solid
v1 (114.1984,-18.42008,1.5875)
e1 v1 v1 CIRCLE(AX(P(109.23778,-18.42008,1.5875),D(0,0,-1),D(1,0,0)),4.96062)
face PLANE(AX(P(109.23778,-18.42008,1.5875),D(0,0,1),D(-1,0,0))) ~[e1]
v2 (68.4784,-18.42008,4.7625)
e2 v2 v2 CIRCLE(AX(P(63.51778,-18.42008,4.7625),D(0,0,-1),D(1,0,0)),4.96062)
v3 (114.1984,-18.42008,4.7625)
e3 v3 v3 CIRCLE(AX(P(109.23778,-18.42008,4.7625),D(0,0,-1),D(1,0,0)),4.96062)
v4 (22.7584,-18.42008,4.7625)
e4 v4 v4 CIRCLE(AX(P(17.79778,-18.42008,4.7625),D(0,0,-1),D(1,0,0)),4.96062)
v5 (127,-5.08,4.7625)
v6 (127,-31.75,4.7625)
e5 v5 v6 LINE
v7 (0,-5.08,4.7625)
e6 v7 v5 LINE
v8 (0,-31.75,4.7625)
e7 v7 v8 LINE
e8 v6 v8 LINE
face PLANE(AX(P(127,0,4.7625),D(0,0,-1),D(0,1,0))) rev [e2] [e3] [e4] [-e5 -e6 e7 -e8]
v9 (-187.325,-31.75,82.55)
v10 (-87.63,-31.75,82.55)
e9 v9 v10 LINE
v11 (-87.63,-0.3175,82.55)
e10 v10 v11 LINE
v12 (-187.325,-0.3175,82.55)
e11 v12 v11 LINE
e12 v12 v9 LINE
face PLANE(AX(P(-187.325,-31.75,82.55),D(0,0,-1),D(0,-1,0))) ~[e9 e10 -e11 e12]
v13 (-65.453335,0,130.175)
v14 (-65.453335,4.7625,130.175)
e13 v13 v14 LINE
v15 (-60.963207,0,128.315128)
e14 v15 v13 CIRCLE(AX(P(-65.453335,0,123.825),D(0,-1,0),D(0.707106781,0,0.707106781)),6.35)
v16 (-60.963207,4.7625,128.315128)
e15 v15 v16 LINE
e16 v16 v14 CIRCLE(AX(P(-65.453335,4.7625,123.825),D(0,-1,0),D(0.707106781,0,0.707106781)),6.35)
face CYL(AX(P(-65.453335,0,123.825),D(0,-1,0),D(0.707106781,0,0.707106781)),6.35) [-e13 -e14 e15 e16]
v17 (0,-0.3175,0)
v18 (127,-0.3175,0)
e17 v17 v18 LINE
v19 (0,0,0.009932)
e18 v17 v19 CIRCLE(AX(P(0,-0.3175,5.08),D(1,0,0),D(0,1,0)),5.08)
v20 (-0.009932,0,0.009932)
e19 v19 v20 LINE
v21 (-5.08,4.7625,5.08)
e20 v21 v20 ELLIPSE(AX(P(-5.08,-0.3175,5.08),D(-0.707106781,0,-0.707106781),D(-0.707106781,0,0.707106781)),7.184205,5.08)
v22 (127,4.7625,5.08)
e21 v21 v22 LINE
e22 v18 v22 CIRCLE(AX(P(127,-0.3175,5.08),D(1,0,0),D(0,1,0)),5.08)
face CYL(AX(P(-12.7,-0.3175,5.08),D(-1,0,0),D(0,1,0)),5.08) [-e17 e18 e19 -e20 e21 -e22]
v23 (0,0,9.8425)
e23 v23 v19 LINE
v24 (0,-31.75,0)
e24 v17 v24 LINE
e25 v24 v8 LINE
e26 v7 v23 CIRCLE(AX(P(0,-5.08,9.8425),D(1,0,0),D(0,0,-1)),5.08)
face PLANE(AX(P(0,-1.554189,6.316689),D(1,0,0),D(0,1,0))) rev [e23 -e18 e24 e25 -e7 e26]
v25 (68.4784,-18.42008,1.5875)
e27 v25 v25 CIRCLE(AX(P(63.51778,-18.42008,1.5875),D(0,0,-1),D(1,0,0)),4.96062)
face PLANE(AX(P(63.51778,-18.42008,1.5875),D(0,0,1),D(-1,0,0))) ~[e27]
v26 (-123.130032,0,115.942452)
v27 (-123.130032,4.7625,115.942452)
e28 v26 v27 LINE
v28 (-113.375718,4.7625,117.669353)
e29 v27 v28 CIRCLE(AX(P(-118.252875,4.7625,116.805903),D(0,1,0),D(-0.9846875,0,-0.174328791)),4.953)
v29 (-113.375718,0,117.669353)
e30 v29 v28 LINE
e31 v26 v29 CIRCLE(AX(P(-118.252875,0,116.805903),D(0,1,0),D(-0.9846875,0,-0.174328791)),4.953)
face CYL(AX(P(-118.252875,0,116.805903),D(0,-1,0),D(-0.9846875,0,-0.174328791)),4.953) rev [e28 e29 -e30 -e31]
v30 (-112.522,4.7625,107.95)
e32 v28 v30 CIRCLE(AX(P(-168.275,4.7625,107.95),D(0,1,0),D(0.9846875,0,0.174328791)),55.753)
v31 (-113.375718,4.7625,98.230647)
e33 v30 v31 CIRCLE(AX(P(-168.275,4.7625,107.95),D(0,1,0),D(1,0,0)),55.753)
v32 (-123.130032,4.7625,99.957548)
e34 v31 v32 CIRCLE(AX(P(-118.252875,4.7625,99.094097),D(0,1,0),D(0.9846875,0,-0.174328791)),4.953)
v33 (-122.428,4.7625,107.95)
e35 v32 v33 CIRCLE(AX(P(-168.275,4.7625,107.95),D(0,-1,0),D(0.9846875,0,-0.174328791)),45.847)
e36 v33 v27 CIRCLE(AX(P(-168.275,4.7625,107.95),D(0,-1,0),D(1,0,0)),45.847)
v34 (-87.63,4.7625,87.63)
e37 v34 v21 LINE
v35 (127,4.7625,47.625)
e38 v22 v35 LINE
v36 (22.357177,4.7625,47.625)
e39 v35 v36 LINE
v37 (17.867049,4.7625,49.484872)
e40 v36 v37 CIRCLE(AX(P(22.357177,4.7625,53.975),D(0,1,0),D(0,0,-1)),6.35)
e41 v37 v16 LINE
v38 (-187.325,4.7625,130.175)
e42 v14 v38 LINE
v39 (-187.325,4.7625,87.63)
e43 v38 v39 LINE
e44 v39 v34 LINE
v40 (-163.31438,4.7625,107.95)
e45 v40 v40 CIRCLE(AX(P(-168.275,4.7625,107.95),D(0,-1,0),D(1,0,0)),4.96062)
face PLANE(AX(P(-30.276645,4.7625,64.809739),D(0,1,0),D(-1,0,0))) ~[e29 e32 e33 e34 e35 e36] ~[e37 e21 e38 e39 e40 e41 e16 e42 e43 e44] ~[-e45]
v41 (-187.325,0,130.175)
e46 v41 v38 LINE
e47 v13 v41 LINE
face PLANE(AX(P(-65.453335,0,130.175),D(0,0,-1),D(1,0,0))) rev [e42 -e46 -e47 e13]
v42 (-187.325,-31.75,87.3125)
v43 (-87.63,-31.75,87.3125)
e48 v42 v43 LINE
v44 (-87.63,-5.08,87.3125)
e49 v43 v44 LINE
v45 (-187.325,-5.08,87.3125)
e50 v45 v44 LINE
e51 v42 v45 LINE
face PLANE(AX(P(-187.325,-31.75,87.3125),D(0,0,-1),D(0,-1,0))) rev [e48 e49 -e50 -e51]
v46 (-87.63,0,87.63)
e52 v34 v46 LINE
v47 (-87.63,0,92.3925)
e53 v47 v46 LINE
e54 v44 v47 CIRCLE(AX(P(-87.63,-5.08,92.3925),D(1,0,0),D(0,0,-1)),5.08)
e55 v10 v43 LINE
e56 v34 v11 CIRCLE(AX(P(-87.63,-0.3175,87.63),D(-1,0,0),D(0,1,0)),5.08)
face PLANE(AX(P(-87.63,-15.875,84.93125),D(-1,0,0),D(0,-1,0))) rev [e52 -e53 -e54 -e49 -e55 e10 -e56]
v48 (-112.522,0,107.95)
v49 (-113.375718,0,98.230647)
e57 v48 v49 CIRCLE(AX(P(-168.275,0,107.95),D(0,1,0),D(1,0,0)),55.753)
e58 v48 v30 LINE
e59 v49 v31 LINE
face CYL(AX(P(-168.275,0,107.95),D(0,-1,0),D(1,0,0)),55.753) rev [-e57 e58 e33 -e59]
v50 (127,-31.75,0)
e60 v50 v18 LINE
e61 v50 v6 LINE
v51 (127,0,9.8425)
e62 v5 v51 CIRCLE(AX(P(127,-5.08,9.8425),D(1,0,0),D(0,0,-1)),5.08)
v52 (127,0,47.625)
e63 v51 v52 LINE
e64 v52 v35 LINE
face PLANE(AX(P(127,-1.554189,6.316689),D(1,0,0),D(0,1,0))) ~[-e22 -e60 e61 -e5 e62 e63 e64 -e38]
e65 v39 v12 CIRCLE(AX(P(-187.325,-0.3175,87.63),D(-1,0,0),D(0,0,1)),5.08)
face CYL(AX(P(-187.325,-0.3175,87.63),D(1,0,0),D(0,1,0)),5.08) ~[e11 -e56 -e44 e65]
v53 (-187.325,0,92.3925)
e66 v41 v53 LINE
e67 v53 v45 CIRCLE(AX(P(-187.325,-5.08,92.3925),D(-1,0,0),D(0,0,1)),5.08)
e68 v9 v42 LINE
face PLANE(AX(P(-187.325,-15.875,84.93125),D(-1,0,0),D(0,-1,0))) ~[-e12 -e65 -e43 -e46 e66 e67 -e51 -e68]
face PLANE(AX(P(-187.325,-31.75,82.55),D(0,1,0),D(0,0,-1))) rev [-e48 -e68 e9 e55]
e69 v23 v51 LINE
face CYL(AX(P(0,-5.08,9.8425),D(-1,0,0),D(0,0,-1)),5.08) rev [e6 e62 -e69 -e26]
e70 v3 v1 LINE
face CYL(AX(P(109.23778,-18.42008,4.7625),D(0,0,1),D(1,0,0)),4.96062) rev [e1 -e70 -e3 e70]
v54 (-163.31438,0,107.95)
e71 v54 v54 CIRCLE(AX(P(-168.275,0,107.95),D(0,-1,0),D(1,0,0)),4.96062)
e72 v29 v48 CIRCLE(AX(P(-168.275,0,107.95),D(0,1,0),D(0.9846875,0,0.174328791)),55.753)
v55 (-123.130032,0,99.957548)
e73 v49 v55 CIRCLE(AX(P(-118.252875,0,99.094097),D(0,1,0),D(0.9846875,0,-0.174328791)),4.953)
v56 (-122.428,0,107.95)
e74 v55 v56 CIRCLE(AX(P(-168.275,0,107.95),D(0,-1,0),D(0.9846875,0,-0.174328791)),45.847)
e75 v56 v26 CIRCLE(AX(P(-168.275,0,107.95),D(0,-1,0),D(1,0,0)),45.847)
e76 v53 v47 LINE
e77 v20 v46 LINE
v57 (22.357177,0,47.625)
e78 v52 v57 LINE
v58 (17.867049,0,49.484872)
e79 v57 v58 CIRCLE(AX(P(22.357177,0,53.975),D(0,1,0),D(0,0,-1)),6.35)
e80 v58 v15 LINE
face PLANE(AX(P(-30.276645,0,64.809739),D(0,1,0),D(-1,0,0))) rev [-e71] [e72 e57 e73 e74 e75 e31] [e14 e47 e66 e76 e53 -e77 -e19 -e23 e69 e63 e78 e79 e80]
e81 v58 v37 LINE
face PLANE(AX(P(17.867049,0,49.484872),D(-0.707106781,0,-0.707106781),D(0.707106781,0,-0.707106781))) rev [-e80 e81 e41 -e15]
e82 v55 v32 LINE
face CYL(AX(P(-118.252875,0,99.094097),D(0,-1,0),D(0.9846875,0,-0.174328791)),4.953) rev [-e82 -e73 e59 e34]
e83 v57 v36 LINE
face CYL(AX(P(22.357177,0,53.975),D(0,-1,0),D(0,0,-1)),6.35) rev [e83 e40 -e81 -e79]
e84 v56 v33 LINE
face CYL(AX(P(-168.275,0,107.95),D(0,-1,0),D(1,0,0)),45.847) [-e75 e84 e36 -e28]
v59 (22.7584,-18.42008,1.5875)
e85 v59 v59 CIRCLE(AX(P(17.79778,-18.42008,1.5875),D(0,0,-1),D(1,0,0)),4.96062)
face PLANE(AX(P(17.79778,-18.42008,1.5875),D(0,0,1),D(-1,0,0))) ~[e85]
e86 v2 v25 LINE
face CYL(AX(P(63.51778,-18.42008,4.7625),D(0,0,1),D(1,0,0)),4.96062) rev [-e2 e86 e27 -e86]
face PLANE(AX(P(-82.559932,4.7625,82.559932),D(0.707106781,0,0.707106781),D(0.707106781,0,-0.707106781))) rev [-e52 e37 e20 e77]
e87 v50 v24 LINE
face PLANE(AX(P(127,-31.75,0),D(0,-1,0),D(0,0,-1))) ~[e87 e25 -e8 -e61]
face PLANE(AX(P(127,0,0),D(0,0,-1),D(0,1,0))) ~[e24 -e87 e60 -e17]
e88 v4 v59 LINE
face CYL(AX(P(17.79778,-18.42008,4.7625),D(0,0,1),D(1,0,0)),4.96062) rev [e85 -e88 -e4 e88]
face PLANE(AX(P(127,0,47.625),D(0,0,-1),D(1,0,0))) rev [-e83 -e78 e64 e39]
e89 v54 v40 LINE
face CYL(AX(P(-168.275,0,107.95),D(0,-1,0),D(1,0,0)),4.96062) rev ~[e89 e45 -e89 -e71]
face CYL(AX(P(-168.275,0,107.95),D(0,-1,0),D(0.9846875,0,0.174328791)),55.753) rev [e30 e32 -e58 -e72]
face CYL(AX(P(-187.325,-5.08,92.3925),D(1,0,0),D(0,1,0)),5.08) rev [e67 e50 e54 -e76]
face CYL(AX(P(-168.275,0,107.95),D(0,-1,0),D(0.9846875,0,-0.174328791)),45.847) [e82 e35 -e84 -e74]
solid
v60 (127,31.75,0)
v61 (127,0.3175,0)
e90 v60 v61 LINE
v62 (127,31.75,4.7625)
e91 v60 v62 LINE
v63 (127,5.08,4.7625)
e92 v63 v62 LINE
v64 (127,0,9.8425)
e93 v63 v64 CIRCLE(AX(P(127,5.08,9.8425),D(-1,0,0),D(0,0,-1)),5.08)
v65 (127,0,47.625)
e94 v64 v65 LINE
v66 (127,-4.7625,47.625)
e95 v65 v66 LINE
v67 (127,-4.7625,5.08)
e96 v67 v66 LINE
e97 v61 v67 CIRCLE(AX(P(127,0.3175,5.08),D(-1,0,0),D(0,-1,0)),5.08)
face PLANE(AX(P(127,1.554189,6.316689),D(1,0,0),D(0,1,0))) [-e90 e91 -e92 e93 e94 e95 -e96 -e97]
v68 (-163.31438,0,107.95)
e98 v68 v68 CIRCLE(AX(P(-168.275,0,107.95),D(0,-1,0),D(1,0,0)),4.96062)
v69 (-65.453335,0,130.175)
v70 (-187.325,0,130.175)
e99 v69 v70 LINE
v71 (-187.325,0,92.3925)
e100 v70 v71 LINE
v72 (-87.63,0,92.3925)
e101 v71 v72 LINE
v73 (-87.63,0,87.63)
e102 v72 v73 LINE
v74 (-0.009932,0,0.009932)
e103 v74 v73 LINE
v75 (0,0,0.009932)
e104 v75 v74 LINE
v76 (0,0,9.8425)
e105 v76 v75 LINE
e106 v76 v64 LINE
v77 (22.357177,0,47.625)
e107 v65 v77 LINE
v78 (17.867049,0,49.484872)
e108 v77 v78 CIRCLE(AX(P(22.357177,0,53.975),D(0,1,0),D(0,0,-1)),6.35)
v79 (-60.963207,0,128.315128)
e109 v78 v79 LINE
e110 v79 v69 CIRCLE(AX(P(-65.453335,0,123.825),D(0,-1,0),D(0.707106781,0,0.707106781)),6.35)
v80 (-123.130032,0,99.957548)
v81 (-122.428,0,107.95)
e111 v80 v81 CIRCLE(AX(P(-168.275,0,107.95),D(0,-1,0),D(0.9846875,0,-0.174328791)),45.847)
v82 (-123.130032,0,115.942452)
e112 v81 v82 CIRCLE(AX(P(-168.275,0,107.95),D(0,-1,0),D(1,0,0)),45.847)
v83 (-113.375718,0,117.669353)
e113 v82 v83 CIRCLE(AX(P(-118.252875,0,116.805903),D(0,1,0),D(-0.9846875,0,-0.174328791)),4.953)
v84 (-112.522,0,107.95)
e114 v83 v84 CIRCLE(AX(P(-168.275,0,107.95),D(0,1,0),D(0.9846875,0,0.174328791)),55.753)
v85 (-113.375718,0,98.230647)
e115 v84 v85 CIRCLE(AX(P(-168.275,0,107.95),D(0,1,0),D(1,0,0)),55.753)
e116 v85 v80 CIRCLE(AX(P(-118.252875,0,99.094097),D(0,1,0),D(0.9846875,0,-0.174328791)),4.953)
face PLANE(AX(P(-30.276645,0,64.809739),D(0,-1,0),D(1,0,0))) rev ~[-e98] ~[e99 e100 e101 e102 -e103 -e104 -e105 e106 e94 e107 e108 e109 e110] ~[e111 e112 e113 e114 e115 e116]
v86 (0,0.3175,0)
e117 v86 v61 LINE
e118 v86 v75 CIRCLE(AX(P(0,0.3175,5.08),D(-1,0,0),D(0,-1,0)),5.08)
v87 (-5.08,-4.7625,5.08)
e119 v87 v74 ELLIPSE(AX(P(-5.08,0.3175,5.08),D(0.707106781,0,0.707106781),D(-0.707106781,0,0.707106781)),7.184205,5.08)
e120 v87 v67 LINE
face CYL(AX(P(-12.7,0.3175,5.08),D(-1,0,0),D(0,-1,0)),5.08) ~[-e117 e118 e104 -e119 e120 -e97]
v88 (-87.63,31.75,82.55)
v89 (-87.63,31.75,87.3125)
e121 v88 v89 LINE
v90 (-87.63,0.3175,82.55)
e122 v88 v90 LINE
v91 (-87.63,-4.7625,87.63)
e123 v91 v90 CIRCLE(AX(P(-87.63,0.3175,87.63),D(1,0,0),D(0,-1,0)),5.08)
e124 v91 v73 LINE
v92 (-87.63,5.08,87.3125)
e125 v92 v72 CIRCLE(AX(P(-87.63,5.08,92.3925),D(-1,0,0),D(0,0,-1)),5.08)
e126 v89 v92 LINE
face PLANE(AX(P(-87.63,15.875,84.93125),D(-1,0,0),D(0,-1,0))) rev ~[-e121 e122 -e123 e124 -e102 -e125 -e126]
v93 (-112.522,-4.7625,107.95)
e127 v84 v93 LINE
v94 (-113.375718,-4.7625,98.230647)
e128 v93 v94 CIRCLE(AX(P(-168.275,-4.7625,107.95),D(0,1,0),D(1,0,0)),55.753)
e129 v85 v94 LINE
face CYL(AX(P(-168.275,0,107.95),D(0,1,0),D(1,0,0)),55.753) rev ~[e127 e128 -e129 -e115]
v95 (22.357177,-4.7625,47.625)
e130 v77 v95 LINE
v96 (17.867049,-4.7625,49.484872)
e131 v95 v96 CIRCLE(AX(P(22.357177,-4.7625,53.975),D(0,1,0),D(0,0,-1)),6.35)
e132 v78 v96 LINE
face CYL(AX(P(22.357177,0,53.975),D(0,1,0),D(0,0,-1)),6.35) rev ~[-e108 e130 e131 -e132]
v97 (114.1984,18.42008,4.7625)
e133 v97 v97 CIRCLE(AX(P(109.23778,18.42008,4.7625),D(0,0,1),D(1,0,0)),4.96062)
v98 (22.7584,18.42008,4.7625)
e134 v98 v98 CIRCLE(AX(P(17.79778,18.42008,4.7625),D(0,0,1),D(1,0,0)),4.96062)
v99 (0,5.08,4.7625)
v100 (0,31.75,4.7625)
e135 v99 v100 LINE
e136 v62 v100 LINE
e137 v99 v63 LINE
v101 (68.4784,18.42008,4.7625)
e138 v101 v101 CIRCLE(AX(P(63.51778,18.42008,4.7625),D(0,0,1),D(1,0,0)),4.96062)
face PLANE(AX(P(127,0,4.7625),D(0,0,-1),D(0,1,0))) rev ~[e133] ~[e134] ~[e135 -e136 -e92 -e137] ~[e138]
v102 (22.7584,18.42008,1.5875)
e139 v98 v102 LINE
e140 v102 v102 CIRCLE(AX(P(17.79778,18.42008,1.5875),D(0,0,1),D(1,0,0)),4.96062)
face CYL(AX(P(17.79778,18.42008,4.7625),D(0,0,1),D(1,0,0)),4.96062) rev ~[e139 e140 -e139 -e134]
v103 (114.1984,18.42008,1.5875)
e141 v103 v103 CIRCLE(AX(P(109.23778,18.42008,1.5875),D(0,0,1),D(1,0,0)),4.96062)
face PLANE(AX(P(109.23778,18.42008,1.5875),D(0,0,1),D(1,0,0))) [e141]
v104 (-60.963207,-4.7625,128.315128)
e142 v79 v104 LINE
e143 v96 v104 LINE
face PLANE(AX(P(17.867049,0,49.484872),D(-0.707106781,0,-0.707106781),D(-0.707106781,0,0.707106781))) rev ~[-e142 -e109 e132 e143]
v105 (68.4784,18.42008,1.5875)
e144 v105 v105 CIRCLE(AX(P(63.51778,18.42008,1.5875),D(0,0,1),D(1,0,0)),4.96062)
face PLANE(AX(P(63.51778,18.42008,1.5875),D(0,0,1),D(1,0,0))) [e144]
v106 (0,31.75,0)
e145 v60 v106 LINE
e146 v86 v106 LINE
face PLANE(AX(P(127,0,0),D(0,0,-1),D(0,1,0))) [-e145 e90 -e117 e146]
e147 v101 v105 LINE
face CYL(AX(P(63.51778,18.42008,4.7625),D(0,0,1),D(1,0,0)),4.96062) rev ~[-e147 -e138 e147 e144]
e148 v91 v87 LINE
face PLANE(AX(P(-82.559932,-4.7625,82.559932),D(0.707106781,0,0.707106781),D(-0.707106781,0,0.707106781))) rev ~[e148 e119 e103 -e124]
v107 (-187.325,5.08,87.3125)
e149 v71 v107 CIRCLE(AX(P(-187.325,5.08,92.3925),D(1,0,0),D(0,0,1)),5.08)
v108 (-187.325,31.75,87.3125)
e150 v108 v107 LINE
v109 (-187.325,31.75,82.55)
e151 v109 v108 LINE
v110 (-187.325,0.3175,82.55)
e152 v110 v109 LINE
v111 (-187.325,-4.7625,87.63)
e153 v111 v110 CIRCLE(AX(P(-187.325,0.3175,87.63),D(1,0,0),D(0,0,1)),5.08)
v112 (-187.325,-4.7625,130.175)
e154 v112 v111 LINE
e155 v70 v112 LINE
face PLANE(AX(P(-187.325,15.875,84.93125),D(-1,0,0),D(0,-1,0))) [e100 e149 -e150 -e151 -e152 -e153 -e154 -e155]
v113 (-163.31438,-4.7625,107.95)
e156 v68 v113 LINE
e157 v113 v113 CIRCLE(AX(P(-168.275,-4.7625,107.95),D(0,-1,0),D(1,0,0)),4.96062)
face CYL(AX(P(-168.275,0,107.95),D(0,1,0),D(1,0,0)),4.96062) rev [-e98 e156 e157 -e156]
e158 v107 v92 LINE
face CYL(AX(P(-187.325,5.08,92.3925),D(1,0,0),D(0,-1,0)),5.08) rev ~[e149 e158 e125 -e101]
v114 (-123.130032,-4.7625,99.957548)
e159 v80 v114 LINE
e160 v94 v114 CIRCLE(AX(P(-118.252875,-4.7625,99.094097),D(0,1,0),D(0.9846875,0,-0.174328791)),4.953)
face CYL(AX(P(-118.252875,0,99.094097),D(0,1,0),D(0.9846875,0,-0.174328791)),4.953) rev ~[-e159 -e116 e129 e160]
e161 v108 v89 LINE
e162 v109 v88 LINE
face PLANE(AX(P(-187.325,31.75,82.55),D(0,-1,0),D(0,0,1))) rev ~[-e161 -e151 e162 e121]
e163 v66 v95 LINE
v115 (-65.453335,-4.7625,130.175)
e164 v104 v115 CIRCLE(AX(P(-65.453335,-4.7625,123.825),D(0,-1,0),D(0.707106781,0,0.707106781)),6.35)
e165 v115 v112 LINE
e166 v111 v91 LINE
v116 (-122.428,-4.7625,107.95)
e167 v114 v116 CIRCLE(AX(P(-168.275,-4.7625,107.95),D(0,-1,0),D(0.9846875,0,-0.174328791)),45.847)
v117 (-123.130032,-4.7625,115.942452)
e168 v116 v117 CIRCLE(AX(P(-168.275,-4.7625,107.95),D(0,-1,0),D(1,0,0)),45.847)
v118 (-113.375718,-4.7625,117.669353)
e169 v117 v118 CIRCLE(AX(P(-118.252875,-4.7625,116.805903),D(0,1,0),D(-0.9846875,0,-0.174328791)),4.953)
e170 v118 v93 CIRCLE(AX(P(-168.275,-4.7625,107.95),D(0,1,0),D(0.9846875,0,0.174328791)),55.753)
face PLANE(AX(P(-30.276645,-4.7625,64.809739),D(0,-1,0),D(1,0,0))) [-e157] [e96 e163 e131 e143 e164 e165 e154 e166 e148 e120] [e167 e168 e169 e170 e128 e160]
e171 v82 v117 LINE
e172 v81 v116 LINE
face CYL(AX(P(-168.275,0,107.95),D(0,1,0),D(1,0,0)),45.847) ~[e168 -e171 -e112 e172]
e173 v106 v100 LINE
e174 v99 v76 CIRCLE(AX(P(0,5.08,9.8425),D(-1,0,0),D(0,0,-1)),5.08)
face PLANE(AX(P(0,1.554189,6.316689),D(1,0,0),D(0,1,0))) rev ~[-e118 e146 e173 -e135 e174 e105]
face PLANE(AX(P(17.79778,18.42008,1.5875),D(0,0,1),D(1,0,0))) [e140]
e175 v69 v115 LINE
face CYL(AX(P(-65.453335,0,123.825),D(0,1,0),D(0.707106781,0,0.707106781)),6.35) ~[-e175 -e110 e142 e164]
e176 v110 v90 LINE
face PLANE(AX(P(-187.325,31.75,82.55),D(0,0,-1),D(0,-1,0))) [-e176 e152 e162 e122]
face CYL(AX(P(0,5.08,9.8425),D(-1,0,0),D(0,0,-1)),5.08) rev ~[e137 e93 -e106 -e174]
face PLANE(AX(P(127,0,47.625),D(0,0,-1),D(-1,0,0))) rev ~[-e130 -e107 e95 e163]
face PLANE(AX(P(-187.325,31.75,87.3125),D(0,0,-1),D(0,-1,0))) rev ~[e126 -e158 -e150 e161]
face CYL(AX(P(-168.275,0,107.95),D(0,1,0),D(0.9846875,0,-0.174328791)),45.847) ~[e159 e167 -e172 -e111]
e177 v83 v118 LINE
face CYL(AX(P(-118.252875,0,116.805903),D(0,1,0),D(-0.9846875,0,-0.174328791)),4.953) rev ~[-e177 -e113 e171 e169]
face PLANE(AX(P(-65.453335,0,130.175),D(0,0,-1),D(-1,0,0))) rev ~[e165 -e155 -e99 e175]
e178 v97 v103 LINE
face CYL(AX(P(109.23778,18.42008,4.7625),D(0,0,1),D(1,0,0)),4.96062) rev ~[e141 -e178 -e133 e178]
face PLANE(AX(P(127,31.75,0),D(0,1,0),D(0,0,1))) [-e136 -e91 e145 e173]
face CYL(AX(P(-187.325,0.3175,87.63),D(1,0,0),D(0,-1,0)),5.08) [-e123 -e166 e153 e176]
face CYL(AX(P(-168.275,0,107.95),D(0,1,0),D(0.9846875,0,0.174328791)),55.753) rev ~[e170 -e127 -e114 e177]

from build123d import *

# Parameters (mm, degrees)
F0_R        = 4.96062
F1_DEPTH    = 4.7625
F2_W        = 31.75
F2_H        = 4.7625
F3_DEPTH    = 127
F4_T1_DEPTH = 127
F4_T3_DEPTH = 152.4
F5_R        = 4.96062
F6_DEPTH    = 3.175
F7_W        = 31.75
F7_H        = 4.7625
F8_DEPTH    = 99.695
F9_R        = 5.08
F11_DEPTH   = 25.4


# Not quite as in the source:
# - a fillet or chamfer that OpenCascade refuses, or shapes differently, is made with other operations: its cross-section is extruded or revolved along the edge and cut away or added


with BuildPart() as f1:
    # F0 (on Front) → F1 (new body)
    with BuildSketch(Plane.XZ):
        with BuildLine():
            Line((-82.55, 82.55), (0, 0))
            Line((0, 0), (127, 0))
            Line((127, 0), (127, 47.625))
            Line((127, 47.625), (22.3571770291, 47.625))
            ThreePointArc((22.3571770291, 47.625), (19.9271372336, 48.1083649686), (17.8670489686, 49.4848719395))
            Line((17.8670489686, 49.4848719395), (-60.9632071525, 128.3151280605))
            ThreePointArc((-60.9632071525, 128.3151280605), (-63.0232954175, 129.6916350314), (-65.4533352131, 130.175))
            Line((-65.4533352131, 130.175), (-187.325, 130.175))
            Line((-187.325, 130.175), (-187.325, 82.55))
            Line((-187.325, 82.55), (-82.55, 82.55))
        make_face()
        with Locations((-168.275, 107.95)):
            Circle(F0_R, mode=Mode.SUBTRACT)
        with BuildLine():
            ThreePointArc((-113.3757178125, 117.6693530802), (-112.7358395418, 112.8283875), (-112.522, 107.95))
            ThreePointArc((-112.522, 107.95), (-112.7358395418, 103.0716125), (-113.3757178125, 98.2306469198))
            ThreePointArc((-113.3757178125, 98.2306469198), (-119.1163255014, 94.2169402337), (-123.1300321875, 99.9575479227))
            ThreePointArc((-123.1300321875, 99.9575479227), (-122.6038452724, 103.9383875), (-122.428, 107.95))
            ThreePointArc((-122.428, 107.95), (-122.6038452724, 111.9616125), (-123.1300321875, 115.9424520773))
            ThreePointArc((-123.1300321875, 115.9424520773), (-119.1163255014, 121.6830597663), (-113.3757178125, 117.6693530802))
        make_face(mode=Mode.SUBTRACT)
    extrude(amount=F1_DEPTH)

    # F2 (on face) → F3 (join)
    with BuildSketch(Plane.YZ.offset(127)):
        with Locations((15.875, 2.38125)):
            Rectangle(F2_W, F2_H)
    extrude(amount=-F3_DEPTH)

    # F4: fillet of radius 5.08 on 2 edges, made by hand

    # F4_s2 → F4_t1 (join)
    with BuildSketch(Plane.YZ):
        with BuildLine():
            ThreePointArc((5.08, 4.7625), (1.4878975516, 6.2503975516), (0, 9.8425))
            Line((0, 9.8425), (0, 4.7625))
            Line((0, 4.7625), (5.08, 4.7625))
        make_face()
    extrude(amount=F4_T1_DEPTH)

    # F4_s4 → F4_t3 (cut)
    with BuildSketch(Plane.YZ.offset(-12.7)):
        with BuildLine():
            ThreePointArc((-4.7625, 5.08), (-3.2746024484, 1.4878975516), (0.3175, 0))
            Line((0.3175, 0), (-4.7625, 0))
            Line((-4.7625, 0), (-4.7625, 5.08))
        make_face()
    extrude(amount=F4_T3_DEPTH, mode=Mode.SUBTRACT)

    # F5 (on face) → F6 (cut)
    with BuildSketch(Plane.XY.offset(4.7625)):
        with Locations((17.79778, 18.42008)):
            Circle(F5_R)
        with Locations((63.51778, 18.42008)):
            Circle(F5_R)
        with Locations((109.23778, 18.42008)):
            Circle(F5_R)
    extrude(amount=-F6_DEPTH, mode=Mode.SUBTRACT)

    # F7 (on face) → F8 (join)
    with BuildSketch(Plane(origin=(-187.325, 0, 0), x_dir=(0, -1, 0), z_dir=(-1, 0, 0))):
        with Locations((-15.875, 84.93125)):
            Rectangle(F7_W, F7_H)
    extrude(amount=-F8_DEPTH)

    # F9
    f9_edges = [f1.edges().sort_by_distance(p)[0] for p in [
        (-134.9375, -4.7625, 82.55),
        (-137.4775, 0, 87.3125),
    ]]
    fillet(f9_edges, radius=F9_R)

    # F10 (on face) → F11 (cut)
    with BuildSketch(Plane.XZ.offset(4.7625)):
        Polygon((-82.5599315833, 82.5599315833), (-87.63, 87.63), (-87.63, 82.5599315833), align=None)
    extrude(amount=-F11_DEPTH, mode=Mode.SUBTRACT)


with BuildPart() as f12_1:
    # F12: instance of F1
    add(f1.part.mirror(Plane.XZ))


solid = Compound([f1.part, f12_1.part])
